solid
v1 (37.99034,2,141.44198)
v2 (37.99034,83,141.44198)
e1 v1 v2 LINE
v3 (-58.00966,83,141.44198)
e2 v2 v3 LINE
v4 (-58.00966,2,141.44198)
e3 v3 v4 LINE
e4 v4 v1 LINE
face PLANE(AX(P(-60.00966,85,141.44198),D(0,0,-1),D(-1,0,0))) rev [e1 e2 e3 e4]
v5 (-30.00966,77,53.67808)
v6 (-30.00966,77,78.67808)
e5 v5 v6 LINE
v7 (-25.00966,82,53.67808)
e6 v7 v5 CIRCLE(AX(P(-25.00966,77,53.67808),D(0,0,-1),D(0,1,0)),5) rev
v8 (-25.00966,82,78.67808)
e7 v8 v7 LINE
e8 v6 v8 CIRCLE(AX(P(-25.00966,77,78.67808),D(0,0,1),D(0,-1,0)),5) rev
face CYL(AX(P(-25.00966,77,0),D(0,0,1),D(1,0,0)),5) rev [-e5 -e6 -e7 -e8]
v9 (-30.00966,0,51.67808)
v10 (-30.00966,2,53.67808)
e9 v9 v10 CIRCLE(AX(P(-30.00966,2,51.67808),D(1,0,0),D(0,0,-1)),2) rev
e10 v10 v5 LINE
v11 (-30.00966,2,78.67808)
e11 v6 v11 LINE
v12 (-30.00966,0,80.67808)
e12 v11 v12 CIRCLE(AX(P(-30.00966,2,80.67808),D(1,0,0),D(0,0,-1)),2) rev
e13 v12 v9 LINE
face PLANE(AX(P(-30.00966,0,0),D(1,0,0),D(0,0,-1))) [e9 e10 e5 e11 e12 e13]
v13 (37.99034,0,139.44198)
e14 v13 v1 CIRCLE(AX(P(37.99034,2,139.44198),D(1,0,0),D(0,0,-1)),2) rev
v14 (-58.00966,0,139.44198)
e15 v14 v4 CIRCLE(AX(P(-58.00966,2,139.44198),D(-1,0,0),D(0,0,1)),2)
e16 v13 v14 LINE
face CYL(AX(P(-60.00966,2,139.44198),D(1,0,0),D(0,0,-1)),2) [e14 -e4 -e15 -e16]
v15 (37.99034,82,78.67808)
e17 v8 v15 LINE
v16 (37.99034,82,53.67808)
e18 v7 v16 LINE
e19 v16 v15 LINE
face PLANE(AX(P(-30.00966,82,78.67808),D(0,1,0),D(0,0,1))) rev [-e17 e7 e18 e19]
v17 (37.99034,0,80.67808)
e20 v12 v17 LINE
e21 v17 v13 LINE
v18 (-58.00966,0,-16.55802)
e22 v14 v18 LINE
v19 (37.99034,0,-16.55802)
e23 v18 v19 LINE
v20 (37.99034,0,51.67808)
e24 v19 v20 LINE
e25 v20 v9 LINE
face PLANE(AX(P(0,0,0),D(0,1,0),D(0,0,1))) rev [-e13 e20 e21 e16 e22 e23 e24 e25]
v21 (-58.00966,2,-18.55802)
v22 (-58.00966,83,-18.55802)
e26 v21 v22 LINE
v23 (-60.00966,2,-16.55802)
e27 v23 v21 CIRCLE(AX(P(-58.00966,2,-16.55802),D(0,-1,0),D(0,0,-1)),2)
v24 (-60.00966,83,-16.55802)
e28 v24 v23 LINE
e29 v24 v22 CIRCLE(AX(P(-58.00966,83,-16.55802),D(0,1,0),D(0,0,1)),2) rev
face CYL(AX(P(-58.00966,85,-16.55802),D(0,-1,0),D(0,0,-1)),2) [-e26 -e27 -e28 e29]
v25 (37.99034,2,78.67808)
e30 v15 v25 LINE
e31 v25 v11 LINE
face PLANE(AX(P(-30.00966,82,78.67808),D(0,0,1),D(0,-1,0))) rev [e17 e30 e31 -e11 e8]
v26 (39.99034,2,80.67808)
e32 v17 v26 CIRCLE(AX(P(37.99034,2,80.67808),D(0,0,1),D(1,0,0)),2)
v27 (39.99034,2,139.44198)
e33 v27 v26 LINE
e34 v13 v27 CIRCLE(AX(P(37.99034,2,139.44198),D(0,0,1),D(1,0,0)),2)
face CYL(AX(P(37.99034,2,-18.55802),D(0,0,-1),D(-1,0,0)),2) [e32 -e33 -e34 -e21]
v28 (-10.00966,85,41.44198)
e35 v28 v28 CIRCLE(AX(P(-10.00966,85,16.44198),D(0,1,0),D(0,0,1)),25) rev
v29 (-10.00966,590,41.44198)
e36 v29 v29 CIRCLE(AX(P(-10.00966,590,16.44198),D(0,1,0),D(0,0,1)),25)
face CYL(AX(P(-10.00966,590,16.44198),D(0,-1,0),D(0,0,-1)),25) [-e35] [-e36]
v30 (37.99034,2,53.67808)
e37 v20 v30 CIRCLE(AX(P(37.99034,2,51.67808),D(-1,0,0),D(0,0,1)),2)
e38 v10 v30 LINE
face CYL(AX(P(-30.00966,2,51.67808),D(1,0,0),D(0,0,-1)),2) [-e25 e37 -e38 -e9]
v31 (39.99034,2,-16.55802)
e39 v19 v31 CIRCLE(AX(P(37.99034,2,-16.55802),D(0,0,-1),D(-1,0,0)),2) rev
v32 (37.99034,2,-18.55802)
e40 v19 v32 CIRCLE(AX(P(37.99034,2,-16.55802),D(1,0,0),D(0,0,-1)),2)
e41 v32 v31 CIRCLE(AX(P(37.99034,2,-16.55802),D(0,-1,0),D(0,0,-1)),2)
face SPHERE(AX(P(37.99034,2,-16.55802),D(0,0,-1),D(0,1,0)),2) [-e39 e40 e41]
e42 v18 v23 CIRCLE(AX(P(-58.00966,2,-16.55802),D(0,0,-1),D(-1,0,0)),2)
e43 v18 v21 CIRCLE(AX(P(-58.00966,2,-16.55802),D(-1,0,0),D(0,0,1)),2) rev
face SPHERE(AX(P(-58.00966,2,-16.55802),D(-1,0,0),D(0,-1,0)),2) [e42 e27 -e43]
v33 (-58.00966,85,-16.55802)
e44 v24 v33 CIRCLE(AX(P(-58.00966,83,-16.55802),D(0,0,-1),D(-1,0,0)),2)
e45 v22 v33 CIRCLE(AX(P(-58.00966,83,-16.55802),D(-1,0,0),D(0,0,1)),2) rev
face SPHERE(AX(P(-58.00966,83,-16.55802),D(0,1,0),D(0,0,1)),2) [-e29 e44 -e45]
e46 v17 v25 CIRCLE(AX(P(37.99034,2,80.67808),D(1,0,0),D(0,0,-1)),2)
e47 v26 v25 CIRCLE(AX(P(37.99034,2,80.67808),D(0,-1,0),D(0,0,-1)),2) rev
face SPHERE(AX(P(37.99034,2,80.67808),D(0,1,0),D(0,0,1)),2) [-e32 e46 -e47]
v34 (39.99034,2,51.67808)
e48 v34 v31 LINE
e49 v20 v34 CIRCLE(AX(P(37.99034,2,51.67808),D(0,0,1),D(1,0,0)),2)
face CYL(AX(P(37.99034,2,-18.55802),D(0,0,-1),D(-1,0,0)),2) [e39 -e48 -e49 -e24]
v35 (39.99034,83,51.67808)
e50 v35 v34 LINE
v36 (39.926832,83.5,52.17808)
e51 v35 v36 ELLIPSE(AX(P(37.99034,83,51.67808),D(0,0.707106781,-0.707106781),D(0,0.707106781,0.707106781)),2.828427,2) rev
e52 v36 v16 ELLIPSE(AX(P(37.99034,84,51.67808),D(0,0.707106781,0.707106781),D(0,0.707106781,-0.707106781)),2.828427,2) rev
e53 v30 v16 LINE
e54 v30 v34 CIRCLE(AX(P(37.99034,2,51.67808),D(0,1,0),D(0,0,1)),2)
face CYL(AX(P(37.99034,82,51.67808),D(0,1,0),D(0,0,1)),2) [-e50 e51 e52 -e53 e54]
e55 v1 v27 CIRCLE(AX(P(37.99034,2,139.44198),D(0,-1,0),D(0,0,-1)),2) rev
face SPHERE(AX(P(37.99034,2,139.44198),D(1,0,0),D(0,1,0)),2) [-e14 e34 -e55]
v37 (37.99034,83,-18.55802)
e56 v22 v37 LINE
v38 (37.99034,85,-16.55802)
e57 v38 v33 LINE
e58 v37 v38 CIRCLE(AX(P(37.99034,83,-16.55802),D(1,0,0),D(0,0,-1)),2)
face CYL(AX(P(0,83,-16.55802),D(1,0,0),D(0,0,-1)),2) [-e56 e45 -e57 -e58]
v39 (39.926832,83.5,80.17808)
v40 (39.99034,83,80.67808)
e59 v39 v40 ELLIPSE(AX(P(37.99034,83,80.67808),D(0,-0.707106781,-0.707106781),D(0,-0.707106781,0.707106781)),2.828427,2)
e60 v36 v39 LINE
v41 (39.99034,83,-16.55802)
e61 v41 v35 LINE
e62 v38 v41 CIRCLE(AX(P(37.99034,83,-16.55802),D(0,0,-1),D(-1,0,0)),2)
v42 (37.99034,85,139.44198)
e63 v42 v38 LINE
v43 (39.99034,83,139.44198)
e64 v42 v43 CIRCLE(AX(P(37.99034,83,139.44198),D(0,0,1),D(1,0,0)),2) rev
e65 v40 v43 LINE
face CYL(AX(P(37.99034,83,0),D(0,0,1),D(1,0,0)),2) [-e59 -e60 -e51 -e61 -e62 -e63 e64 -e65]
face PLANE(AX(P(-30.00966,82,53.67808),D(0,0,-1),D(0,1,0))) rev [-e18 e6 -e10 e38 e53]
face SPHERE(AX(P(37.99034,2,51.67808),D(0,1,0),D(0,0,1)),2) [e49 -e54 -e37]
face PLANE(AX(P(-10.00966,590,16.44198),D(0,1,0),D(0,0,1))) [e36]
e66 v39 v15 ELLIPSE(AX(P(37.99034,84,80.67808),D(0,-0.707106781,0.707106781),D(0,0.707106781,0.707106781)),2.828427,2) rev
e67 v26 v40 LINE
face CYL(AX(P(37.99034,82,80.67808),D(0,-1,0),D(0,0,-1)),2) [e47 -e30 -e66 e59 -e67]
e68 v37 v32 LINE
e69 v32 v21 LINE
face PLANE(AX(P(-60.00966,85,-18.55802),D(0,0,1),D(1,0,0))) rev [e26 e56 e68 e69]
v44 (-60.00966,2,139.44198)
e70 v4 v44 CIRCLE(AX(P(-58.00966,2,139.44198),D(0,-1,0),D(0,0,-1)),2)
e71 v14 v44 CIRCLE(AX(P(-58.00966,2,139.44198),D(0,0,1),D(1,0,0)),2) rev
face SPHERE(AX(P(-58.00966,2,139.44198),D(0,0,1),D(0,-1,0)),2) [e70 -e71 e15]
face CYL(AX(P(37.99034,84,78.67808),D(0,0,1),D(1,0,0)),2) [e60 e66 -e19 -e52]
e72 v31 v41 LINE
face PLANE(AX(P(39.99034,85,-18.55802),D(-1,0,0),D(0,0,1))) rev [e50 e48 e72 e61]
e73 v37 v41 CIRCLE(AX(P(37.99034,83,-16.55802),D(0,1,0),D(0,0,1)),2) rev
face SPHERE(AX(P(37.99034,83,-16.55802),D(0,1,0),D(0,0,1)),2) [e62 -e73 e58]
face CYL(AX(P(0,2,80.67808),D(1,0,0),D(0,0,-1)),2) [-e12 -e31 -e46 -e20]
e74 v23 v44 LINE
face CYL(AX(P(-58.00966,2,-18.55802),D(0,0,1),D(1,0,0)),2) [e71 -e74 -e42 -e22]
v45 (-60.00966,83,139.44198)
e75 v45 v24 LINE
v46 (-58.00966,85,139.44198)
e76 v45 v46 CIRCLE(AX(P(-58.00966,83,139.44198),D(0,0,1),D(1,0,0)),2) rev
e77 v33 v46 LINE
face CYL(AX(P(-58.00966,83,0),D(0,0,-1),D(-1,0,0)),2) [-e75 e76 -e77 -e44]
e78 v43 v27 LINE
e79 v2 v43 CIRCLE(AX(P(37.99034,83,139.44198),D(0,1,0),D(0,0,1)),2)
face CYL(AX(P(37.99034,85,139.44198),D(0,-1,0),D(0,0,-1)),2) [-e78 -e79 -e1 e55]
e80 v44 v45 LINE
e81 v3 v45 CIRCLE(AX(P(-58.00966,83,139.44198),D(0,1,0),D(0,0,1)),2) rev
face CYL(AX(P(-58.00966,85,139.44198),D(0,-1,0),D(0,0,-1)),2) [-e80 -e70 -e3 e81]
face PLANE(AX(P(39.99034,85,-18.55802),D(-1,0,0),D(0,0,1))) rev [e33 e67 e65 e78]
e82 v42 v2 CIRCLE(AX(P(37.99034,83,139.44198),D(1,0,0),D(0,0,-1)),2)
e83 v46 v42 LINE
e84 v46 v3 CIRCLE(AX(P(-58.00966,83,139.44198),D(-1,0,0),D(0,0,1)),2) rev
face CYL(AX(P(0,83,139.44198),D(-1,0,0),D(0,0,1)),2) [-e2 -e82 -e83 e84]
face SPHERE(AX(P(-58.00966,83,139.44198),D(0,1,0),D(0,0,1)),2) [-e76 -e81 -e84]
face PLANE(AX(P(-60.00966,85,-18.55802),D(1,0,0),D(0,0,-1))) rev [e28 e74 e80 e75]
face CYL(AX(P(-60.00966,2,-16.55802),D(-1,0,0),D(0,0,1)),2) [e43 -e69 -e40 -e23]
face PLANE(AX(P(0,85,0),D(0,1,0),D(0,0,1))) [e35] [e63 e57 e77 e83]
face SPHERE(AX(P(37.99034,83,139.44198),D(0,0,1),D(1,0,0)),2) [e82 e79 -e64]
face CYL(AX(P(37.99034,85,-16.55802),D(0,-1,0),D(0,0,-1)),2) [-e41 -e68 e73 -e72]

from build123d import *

# Parameters (mm, degrees)
SKETCH1_W           = 100
SKETCH1_H           = 160
BOSS_EXTRUDE1_DEPTH = 85
SKETCH2_R           = 25
BOSS_EXTRUDE2_DEPTH = 590
SKETCH3_W           = 25
SKETCH3_H           = 82
CUT_EXTRUDE1_DEPTH  = 70
FILLET2_R           = 2
FILLET3_R           = 5
FILLET4_R           = 2


with BuildPart() as part:
    # Sketch1 → Boss-Extrude1 (new body)
    with BuildSketch(Plane(origin=(0, 0, 0), x_dir=(1, 0, 0), z_dir=(0, 1, 0))):
        with Locations((-10.009659714, -61.441979522)):
            Rectangle(SKETCH1_W, SKETCH1_H)
    extrude(amount=BOSS_EXTRUDE1_DEPTH)

    # Sketch2 → Boss-Extrude2 (add)
    with BuildSketch(Plane(origin=(0, 0, 0), x_dir=(1, 0, 0), z_dir=(0, 1, 0))):
        with Locations(Location((-10.009659714, -16.441979522, 0), (0, 0, 270))):
            Circle(SKETCH2_R)
    extrude(amount=BOSS_EXTRUDE2_DEPTH)

    # Sketch3 → Cut-Extrude1 (cut)
    with BuildSketch(Plane(origin=(39.990340286, 0, 0), x_dir=(0, 0, -1), z_dir=(1, 0, 0))):
        with Locations((-66.178079743, 41)):
            Rectangle(SKETCH3_W, SKETCH3_H)
    extrude(amount=-CUT_EXTRUDE1_DEPTH, mode=Mode.SUBTRACT)

    # Fillet2
    fillet2_edges = [part.edges().sort_by_distance(p)[0] for p in [
        (39.990340286, 41, 53.678079743),
        (39.990340286, 82, 66.178079743),
        (39.990340286, 41, 78.678079743),
    ]]
    fillet(fillet2_edges, radius=FILLET2_R)

    # Fillet3
    fillet3_edges = [part.edges().sort_by_distance(p)[0] for p in [
        (-30.009659714, 82, 66.178079743),
    ]]
    fillet(fillet3_edges, radius=FILLET3_R)

    # Fillet4
    # the kernel refuses this fillet: 2 mm, written as the material it takes off along each edge
    with BuildSketch(Plane(origin=(-58.009659714, 83, -16.558020478), x_dir=(0, 0, -1), z_dir=(-1, 0, 0))) as fillet4_piece_1_section:
        Polygon((0, 0), (FILLET4_R, 0), (FILLET4_R, -FILLET4_R), (0, -FILLET4_R), align=None)
    fillet4_piece_1 = extrude(amount=FILLET4_R, mode=Mode.PRIVATE)
    fillet4_piece_1 = fillet4_piece_1 - Plane(origin=(-58.009659714, 83, -16.558020478), x_dir=(0, -0.7071067811865475, 0.7071067811865475), z_dir=(-1, 0, 0)) * Sphere(FILLET4_R, mode=Mode.PRIVATE)
    add(fillet4_piece_1, mode=Mode.SUBTRACT)
    with BuildSketch(Plane(origin=(37.990340286, 83, -16.558020478), x_dir=(0, 1, 0), z_dir=(0, 0, -1))) as fillet4_piece_2_section:
        Polygon((0, 0), (FILLET4_R, 0), (FILLET4_R, FILLET4_R), (0, FILLET4_R), align=None)
    fillet4_piece_2 = extrude(amount=FILLET4_R, mode=Mode.PRIVATE)
    fillet4_piece_2 = fillet4_piece_2 - Plane(origin=(37.990340286, 83, -16.558020478), x_dir=(-0.7071067811865475, -0.7071067811865475, 0), z_dir=(0, 0, -1)) * Sphere(FILLET4_R, mode=Mode.PRIVATE)
    add(fillet4_piece_2, mode=Mode.SUBTRACT)
    with BuildSketch(Plane(origin=(-58.009659714, 2, -16.558020478), x_dir=(0, 0, -1), z_dir=(-1, 0, 0))) as fillet4_piece_3_section:
        Polygon((0, 0), (FILLET4_R, 0), (FILLET4_R, FILLET4_R), (0, FILLET4_R), align=None)
    fillet4_piece_3 = extrude(amount=FILLET4_R, mode=Mode.PRIVATE)
    fillet4_piece_3 = fillet4_piece_3 - Plane(origin=(-58.009659714, 2, -16.558020478), x_dir=(0, 0.7071067811865475, 0.7071067811865475), z_dir=(-1, 0, 0)) * Sphere(FILLET4_R, mode=Mode.PRIVATE)
    add(fillet4_piece_3, mode=Mode.SUBTRACT)
    with BuildSketch(Plane(origin=(37.990340286, 2, -16.558020478), x_dir=(0, -1, 0), z_dir=(0, 0, -1))) as fillet4_piece_4_section:
        Polygon((0, 0), (FILLET4_R, 0), (FILLET4_R, -FILLET4_R), (0, -FILLET4_R), align=None)
    fillet4_piece_4 = extrude(amount=FILLET4_R, mode=Mode.PRIVATE)
    fillet4_piece_4 = fillet4_piece_4 - Plane(origin=(37.990340286, 2, -16.558020478), x_dir=(-0.7071067811865475, 0.7071067811865475, 0), z_dir=(0, 0, -1)) * Sphere(FILLET4_R, mode=Mode.PRIVATE)
    add(fillet4_piece_4, mode=Mode.SUBTRACT)
    with BuildSketch(Plane(origin=(37.990340286, 2, 139.441979522), x_dir=(0, -1, 0), z_dir=(0, 0, 1))) as fillet4_piece_5_section:
        Polygon((0, 0), (FILLET4_R, 0), (FILLET4_R, FILLET4_R), (0, FILLET4_R), align=None)
    fillet4_piece_5 = extrude(amount=FILLET4_R, mode=Mode.PRIVATE)
    fillet4_piece_5 = fillet4_piece_5 - Plane(origin=(37.990340286, 2, 139.441979522), x_dir=(-0.7071067811865475, 0.7071067811865475, 0), z_dir=(0, 0, 1)) * Sphere(FILLET4_R, mode=Mode.PRIVATE)
    add(fillet4_piece_5, mode=Mode.SUBTRACT)
    with BuildSketch(Plane(origin=(37.990340286, 83, 139.441979522), x_dir=(0, 1, 0), z_dir=(0, 0, 1))) as fillet4_piece_6_section:
        Polygon((0, 0), (FILLET4_R, 0), (FILLET4_R, -FILLET4_R), (0, -FILLET4_R), align=None)
    fillet4_piece_6 = extrude(amount=FILLET4_R, mode=Mode.PRIVATE)
    fillet4_piece_6 = fillet4_piece_6 - Plane(origin=(37.990340286, 83, 139.441979522), x_dir=(-0.7071067811865475, -0.7071067811865475, 0), z_dir=(0, 0, 1)) * Sphere(FILLET4_R, mode=Mode.PRIVATE)
    add(fillet4_piece_6, mode=Mode.SUBTRACT)
    with BuildSketch(Plane(origin=(-58.009659714, 83, 139.441979522), x_dir=(-1, 0, 0), z_dir=(0, 0, 1))) as fillet4_piece_7_section:
        Polygon((0, 0), (FILLET4_R, 0), (FILLET4_R, -FILLET4_R), (0, -FILLET4_R), align=None)
    fillet4_piece_7 = extrude(amount=FILLET4_R, mode=Mode.PRIVATE)
    fillet4_piece_7 = fillet4_piece_7 - Plane(origin=(-58.009659714, 83, 139.441979522), x_dir=(0.7071067811865475, -0.7071067811865475, 0), z_dir=(0, 0, 1)) * Sphere(FILLET4_R, mode=Mode.PRIVATE)
    add(fillet4_piece_7, mode=Mode.SUBTRACT)
    with BuildSketch(Plane(origin=(-58.009659714, 2, 139.441979522), x_dir=(-1, 0, 0), z_dir=(0, 0, 1))) as fillet4_piece_8_section:
        Polygon((0, 0), (FILLET4_R, 0), (FILLET4_R, FILLET4_R), (0, FILLET4_R), align=None)
    fillet4_piece_8 = extrude(amount=FILLET4_R, mode=Mode.PRIVATE)
    fillet4_piece_8 = fillet4_piece_8 - Plane(origin=(-58.009659714, 2, 139.441979522), x_dir=(0.7071067811865475, 0.7071067811865475, 0), z_dir=(0, 0, 1)) * Sphere(FILLET4_R, mode=Mode.PRIVATE)
    add(fillet4_piece_8, mode=Mode.SUBTRACT)
    with BuildSketch(Plane(origin=(37.990340286, 0, 53.678079743), x_dir=(0, 0, -1), z_dir=(-1, 0, 0)), Plane(origin=(37.990340286, 0, 78.678079743), x_dir=(0, 1, 0), z_dir=(-1, 0, 0))) as fillet4_piece_9:
        with BuildLine():
            CenterArc((FILLET4_R, -FILLET4_R), FILLET4_R, 90, 90)
            Line((0, -FILLET4_R), (0, 0))
            Line((0, 0), (FILLET4_R, 0))
        make_face()
    extrude(amount=68, mode=Mode.SUBTRACT)
    with BuildSketch(Plane(origin=(37.990340286, 0, 51.678079743), x_dir=(1, 0, 0), z_dir=(0, 0, -1))) as fillet4_piece_10:
        with BuildLine():
            CenterArc((2 - FILLET4_R, -FILLET4_R), FILLET4_R, 0, 90)
            Line((2, -FILLET4_R), (2, 0))
            Line((2, 0), (2 - FILLET4_R, 0))
        make_face()
    revolve(axis=Axis((37.990340286, 0, 51.678079743), (0, -1, 0)), revolution_arc=90, mode=Mode.SUBTRACT)
    with BuildSketch(Plane(origin=(37.990340286, 0, 80.678079743), x_dir=(1, 0, 0), z_dir=(0, 0, 1))) as fillet4_piece_11:
        with BuildLine():
            CenterArc((2 - FILLET4_R, FILLET4_R), FILLET4_R, 270, 90)
            Line((2, FILLET4_R), (2, 0))
            Line((2, 0), (2 - FILLET4_R, 0))
        make_face()
    revolve(axis=Axis((37.990340286, 0, 80.678079743), (0, 1, 0)), revolution_arc=90, mode=Mode.SUBTRACT)
    with BuildSketch(Plane(origin=(-58.009659714, 85, -18.558020478), x_dir=(0, -1, 0), z_dir=(1, 0, 0)), Plane(origin=(-58.009659714, 0, -18.558020478), x_dir=(0, 0, 1), z_dir=(1, 0, 0)), Plane(origin=(37.990340286, 85, 141.441979522), x_dir=(0, -1, 0), z_dir=(-1, 0, 0)), Plane(origin=(37.990340286, 0, 141.441979522), x_dir=(0, 0, -1), z_dir=(-1, 0, 0))) as fillet4_piece_12:
        with BuildLine():
            CenterArc((FILLET4_R, -FILLET4_R), FILLET4_R, 90, 90)
            Line((0, -FILLET4_R), (0, 0))
            Line((0, 0), (FILLET4_R, 0))
        make_face()
    extrude(amount=96, mode=Mode.SUBTRACT)
    with BuildSketch(Plane(origin=(-60.009659714, 2, -18.558020478), x_dir=(0, 0, 1), z_dir=(0, 1, 0)), Plane(origin=(39.990340286, 2, 141.441979522), x_dir=(0, 0, -1), z_dir=(0, 1, 0)), Plane(origin=(-60.009659714, 2, 141.441979522), x_dir=(1, 0, 0), z_dir=(0, 1, 0))) as fillet4_piece_13:
        with BuildLine():
            CenterArc((FILLET4_R, FILLET4_R), FILLET4_R, 180, 90)
            Line((0, FILLET4_R), (0, 0))
            Line((0, 0), (FILLET4_R, 0))
        make_face()
    extrude(amount=81, mode=Mode.SUBTRACT)
    with BuildSketch(Plane(origin=(39.990340286, 0, -16.558020478), x_dir=(-1, 0, 0), z_dir=(0, 0, 1))) as fillet4_piece_14:
        with BuildLine():
            CenterArc((FILLET4_R, -FILLET4_R), FILLET4_R, 90, 90)
            Line((0, -FILLET4_R), (0, 0))
            Line((0, 0), (FILLET4_R, 0))
        make_face()
    extrude(amount=68.236100221, mode=Mode.SUBTRACT)
    with BuildSketch(Plane(origin=(39.990340286, 0, 80.678079743), x_dir=(-1, 0, 0), z_dir=(0, 0, 1))) as fillet4_piece_15:
        with BuildLine():
            CenterArc((FILLET4_R, -FILLET4_R), FILLET4_R, 90, 90)
            Line((0, -FILLET4_R), (0, 0))
            Line((0, 0), (FILLET4_R, 0))
        make_face()
    extrude(amount=58.763899779, mode=Mode.SUBTRACT)
    with BuildSketch(Plane(origin=(39.990340286, 2, -18.558020478), x_dir=(0, 0, 1), z_dir=(0, 1, 0))) as fillet4_piece_16:
        with BuildLine():
            CenterArc((FILLET4_R, -FILLET4_R), FILLET4_R, 90, 90)
            Line((0, -FILLET4_R), (0, 0))
            Line((0, 0), (FILLET4_R, 0))
        make_face()
    extrude(amount=81, mode=Mode.SUBTRACT)
    with BuildSketch(Plane(origin=(39.990340286, 85, -16.558020478), x_dir=(0, -1, 0), z_dir=(0, 0, 1)), Plane(origin=(-60.009659714, 0, 139.441979522), x_dir=(1, 0, 0), z_dir=(0, 0, -1)), Plane(origin=(-60.009659714, 85, 139.441979522), x_dir=(0, -1, 0), z_dir=(0, 0, -1))) as fillet4_piece_17:
        with BuildLine():
            CenterArc((FILLET4_R, -FILLET4_R), FILLET4_R, 90, 90)
            Line((0, -FILLET4_R), (0, 0))
            Line((0, 0), (FILLET4_R, 0))
        make_face()
    extrude(amount=156, mode=Mode.SUBTRACT)


solid = part.part
